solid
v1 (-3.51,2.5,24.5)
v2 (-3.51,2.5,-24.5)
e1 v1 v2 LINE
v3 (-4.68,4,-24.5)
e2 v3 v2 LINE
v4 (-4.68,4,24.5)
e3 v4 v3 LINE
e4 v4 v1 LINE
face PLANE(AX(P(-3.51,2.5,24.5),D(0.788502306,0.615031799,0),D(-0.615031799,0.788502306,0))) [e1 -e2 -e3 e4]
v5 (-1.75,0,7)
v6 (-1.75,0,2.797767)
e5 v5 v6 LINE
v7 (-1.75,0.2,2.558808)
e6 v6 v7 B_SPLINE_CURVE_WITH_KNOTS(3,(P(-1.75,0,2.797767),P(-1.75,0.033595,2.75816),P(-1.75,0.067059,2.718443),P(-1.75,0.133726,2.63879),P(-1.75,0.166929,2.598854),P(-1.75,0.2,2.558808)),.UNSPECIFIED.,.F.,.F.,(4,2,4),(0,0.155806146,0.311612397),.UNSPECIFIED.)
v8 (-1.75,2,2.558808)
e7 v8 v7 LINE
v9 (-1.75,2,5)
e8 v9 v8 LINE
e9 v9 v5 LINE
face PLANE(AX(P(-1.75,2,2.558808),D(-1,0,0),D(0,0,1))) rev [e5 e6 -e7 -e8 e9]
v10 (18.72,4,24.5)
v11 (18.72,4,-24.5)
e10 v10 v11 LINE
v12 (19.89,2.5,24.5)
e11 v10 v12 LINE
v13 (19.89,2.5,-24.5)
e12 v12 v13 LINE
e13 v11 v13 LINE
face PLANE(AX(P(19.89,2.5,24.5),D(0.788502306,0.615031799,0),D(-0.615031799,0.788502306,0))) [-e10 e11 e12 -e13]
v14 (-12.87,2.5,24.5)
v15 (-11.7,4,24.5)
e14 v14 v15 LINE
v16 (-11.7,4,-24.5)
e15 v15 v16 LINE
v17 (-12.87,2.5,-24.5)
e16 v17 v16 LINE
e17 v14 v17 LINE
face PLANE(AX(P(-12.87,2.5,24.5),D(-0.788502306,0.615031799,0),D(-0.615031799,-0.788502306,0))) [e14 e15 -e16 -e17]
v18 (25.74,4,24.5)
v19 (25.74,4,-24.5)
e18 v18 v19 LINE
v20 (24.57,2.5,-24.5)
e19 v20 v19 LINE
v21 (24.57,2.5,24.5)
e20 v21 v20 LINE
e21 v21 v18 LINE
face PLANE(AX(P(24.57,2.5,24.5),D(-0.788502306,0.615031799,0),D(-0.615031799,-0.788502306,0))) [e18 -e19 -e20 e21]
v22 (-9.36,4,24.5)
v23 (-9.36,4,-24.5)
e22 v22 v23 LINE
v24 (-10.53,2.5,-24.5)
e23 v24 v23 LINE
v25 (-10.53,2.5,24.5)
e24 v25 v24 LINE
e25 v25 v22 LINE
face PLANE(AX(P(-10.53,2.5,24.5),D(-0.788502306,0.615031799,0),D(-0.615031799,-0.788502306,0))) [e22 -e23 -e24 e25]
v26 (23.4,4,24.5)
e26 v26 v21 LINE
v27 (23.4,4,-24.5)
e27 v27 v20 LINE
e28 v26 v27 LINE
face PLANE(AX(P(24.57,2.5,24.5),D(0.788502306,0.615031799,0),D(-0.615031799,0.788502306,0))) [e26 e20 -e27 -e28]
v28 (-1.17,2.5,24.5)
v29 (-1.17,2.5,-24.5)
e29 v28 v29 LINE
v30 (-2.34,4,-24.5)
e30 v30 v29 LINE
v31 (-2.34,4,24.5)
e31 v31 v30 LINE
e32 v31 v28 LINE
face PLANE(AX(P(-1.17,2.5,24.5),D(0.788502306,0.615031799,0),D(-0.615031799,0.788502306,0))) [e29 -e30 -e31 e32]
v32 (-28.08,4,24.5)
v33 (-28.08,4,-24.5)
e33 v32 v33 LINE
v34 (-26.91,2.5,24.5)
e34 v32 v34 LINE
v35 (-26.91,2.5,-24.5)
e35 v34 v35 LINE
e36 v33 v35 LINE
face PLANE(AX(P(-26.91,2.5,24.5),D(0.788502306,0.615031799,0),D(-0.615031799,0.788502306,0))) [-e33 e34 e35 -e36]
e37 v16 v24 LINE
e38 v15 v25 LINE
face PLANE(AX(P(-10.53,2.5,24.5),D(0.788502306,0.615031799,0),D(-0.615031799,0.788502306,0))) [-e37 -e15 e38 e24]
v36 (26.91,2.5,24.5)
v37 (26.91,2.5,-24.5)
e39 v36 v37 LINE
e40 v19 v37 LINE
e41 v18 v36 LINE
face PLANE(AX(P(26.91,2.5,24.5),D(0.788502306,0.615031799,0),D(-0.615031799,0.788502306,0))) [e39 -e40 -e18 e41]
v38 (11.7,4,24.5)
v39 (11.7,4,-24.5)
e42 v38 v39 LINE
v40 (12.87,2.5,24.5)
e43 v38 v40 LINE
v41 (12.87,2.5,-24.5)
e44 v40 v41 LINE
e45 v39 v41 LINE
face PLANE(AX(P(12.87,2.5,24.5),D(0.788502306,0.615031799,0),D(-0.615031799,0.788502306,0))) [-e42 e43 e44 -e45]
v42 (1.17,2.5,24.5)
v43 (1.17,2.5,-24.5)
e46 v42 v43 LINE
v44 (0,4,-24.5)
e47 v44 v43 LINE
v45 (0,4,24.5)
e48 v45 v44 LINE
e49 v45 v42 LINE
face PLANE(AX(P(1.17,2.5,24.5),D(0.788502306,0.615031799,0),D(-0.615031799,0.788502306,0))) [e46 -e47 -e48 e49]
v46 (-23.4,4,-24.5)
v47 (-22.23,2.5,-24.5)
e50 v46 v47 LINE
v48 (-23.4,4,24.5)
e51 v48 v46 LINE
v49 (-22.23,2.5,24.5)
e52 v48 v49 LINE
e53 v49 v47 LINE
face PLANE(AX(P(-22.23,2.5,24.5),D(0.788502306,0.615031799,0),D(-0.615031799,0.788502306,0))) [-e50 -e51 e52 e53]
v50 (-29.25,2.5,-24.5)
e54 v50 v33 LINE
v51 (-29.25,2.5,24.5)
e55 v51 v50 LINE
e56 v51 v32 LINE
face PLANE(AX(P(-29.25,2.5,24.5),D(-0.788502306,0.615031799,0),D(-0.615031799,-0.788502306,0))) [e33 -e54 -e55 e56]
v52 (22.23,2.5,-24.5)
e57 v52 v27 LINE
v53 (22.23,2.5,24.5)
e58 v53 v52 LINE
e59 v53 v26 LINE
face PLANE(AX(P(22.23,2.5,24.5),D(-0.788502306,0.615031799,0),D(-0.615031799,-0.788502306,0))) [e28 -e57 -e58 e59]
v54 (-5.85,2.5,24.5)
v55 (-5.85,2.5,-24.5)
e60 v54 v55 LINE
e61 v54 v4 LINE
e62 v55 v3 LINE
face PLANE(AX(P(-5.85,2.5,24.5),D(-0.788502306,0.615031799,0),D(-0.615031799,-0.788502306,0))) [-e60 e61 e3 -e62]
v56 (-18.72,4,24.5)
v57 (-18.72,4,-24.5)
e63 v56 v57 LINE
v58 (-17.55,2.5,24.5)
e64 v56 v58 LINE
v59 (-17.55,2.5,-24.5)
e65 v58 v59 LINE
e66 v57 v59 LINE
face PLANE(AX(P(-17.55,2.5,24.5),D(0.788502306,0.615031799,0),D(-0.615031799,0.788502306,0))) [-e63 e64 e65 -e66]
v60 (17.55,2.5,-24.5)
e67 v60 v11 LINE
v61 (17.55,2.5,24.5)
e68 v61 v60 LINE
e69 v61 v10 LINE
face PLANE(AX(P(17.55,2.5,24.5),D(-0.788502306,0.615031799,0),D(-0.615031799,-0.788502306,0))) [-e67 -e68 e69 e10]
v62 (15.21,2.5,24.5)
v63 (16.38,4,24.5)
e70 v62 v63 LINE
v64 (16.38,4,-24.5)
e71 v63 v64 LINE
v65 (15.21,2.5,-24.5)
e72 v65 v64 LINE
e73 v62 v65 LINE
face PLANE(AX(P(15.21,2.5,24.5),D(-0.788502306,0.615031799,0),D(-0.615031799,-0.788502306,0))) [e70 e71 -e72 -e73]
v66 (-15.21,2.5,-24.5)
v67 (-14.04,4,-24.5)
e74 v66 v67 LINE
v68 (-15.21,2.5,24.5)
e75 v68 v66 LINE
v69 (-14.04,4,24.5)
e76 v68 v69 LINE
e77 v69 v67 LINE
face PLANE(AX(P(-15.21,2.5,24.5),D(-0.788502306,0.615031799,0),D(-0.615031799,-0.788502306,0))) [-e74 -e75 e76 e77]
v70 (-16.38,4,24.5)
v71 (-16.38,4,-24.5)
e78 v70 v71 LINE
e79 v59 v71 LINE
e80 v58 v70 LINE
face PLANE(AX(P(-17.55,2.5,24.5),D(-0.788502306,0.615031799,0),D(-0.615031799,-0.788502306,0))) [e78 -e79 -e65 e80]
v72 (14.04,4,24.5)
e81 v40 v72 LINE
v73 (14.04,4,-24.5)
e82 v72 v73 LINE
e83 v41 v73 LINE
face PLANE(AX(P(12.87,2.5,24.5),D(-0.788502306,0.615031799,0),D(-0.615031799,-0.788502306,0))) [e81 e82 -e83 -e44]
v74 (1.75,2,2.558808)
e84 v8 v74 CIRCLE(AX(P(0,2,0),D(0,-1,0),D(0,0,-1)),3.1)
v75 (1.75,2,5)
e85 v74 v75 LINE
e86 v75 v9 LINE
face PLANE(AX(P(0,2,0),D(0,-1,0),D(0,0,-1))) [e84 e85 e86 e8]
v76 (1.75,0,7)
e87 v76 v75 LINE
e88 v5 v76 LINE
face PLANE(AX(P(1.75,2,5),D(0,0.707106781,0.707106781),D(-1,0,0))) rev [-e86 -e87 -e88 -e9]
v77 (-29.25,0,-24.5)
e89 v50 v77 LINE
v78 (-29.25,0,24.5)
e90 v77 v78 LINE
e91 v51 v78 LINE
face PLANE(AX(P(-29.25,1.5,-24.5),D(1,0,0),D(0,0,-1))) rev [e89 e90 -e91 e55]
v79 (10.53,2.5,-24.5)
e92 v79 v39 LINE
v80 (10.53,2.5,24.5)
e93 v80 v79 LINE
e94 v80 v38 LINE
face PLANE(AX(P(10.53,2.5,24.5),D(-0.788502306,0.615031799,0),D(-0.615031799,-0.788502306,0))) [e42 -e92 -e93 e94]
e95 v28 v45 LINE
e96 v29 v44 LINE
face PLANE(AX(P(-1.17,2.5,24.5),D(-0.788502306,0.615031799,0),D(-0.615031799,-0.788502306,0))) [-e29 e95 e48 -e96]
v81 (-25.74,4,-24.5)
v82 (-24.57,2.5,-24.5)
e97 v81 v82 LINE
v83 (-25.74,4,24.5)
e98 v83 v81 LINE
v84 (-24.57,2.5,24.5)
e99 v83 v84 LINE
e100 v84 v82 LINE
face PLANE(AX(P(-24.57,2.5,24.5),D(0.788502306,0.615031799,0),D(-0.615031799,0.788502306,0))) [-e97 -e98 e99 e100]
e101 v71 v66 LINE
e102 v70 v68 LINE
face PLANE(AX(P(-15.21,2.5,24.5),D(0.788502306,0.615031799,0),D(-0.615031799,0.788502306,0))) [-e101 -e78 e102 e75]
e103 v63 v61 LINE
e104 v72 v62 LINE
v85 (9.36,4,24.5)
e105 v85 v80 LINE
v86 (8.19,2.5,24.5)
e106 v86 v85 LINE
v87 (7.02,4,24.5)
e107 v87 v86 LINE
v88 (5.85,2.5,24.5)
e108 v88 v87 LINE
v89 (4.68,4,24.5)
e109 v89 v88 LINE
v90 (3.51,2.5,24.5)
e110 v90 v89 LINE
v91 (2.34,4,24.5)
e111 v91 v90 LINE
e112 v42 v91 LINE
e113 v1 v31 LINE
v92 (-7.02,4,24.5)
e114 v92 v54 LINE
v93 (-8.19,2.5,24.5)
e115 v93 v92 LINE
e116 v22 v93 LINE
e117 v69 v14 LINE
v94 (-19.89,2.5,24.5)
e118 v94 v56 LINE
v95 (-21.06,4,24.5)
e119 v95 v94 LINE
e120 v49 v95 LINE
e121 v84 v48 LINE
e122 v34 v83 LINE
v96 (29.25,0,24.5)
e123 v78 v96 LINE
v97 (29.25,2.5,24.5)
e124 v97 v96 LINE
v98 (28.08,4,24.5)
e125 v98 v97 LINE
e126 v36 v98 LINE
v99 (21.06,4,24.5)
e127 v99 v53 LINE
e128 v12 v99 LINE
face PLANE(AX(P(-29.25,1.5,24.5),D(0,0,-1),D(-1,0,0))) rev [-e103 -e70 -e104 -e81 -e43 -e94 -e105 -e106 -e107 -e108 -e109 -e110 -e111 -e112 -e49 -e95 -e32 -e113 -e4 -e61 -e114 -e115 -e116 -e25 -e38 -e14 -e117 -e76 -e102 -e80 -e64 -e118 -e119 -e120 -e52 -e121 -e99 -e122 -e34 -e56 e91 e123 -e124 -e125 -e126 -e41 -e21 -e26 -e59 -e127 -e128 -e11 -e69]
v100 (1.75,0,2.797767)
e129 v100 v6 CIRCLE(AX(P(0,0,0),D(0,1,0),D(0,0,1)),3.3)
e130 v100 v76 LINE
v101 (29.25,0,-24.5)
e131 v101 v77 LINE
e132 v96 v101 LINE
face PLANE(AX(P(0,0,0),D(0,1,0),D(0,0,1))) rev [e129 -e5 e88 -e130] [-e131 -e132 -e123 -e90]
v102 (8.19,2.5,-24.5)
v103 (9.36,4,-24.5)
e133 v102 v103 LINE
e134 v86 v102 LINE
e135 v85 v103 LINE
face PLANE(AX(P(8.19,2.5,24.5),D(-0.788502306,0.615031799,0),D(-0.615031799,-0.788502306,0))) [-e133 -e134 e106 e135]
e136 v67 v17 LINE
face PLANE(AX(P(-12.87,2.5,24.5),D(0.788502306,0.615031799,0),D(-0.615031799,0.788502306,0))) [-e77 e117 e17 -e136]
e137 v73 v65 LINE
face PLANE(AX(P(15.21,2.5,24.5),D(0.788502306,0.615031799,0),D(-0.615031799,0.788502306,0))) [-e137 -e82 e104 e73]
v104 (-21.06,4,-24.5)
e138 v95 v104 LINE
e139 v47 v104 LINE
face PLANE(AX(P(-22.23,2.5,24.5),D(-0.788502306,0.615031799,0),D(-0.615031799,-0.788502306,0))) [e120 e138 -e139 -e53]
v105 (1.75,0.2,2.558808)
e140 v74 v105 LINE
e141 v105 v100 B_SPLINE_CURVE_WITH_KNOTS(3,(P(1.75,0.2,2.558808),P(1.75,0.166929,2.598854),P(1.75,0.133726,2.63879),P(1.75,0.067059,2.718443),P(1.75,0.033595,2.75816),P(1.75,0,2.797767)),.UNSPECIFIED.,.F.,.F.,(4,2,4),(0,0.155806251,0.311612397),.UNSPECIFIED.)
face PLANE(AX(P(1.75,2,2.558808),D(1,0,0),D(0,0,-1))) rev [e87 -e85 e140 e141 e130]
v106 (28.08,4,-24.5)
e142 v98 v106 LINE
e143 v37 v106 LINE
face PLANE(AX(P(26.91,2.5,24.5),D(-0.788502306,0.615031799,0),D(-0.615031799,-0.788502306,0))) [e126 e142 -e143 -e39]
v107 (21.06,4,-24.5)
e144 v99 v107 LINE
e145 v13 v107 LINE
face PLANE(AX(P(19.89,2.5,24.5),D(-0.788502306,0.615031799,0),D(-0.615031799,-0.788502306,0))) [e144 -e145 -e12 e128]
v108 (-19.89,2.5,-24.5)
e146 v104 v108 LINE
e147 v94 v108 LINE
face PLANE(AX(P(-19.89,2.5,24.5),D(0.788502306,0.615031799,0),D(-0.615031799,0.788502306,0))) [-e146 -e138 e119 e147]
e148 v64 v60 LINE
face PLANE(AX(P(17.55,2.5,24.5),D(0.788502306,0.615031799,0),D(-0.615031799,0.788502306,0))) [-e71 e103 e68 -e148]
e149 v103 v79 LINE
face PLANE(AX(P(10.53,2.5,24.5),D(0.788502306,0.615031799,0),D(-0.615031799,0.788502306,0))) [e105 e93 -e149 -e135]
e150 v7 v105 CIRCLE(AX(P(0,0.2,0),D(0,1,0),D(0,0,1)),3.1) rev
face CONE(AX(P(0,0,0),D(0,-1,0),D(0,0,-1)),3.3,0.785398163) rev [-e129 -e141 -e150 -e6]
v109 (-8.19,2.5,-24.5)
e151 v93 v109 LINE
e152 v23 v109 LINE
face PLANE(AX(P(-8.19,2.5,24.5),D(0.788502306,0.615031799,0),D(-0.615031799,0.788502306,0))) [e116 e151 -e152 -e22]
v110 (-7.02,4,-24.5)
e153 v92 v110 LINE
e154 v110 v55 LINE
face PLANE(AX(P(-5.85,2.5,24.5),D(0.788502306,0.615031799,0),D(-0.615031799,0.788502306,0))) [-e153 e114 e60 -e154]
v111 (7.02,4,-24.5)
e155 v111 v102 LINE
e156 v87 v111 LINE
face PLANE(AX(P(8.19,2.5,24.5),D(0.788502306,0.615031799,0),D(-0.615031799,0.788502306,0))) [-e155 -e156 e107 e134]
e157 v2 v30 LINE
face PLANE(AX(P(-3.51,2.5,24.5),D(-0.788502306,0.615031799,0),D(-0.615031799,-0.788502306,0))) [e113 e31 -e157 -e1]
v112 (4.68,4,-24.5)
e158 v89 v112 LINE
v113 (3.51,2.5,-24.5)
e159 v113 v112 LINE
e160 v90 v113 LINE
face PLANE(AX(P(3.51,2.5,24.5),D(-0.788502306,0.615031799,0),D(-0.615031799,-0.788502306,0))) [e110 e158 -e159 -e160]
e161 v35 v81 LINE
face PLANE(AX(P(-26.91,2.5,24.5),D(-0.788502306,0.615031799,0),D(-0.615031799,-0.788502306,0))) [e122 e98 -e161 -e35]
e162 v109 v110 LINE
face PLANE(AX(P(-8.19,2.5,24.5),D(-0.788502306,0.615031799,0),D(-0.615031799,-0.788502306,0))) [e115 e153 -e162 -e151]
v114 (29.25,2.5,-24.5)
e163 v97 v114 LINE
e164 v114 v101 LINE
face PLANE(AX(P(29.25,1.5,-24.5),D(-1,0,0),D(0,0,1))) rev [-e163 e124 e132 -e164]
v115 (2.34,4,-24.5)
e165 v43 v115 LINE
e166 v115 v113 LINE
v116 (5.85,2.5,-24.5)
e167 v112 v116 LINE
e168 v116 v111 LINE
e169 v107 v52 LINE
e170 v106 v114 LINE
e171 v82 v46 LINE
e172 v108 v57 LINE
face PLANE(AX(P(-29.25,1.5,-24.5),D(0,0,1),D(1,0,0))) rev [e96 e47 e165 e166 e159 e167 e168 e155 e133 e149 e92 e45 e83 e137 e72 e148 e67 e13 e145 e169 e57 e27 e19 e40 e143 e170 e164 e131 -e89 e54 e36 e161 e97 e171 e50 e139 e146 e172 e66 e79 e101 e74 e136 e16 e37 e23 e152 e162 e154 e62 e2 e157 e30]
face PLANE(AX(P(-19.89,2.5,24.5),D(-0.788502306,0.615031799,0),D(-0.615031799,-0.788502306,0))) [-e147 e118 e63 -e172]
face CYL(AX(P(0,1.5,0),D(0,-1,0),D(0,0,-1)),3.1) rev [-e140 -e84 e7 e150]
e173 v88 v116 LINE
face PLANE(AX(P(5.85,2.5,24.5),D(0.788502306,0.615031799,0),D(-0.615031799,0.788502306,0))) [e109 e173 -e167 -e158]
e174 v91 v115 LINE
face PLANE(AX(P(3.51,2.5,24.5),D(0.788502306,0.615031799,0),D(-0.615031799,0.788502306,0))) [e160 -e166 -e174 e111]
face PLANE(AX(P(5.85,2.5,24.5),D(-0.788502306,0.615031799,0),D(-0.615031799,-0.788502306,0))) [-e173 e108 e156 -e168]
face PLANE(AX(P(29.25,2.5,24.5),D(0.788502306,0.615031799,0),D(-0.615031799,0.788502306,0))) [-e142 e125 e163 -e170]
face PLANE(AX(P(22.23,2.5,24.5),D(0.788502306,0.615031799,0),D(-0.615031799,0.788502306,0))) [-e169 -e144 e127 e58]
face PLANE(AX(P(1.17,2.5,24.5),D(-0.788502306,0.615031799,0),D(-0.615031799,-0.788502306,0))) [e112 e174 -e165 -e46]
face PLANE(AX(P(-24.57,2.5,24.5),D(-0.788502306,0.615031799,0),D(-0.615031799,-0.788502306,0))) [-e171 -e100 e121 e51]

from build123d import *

# Parameters (mm, degrees)
SKETCH1_W           = 58.5
SKETCH1_H           = 49
SKETCH1_R           = 3.1
BOSS_EXTRUDE1_DEPTH = 1.5
BOSS_EXTRUDE2_DEPTH = 49
CUT_EXTRUDE1_DEPTH  = 2
CHAMFER1_SIZE       = 2
CHAMFER2_SIZE       = 0.2


with BuildPart() as part:
    # Sketch1 → Boss-Extrude1 (new body)
    with BuildSketch(Plane(origin=(0, 0, 0), x_dir=(1, 0, 0), z_dir=(0, 1, 0))):
        Rectangle(SKETCH1_W, SKETCH1_H)
        with Locations(Location((0, 0, 0), (0, 0, 270))):
            Circle(SKETCH1_R, mode=Mode.SUBTRACT)
    extrude(amount=BOSS_EXTRUDE1_DEPTH)

    # Sketch2 → Boss-Extrude2 (add)
    with BuildSketch(Plane(origin=(0, 0, -24.5), x_dir=(-1, 0, 0), z_dir=(0, 0, -1))):
        Polygon((-29.25, 1.5), (29.25, 1.5), (29.25, 2.5), (28.08, 4), (26.91, 2.5), (25.74, 4), (24.57, 2.5), (23.4, 4), (22.23, 2.5), (21.06, 4), (19.89, 2.5), (18.72, 4), (17.55, 2.5), (16.38, 4), (15.21, 2.5), (14.04, 4), (12.87, 2.5), (11.7, 4), (10.53, 2.5), (9.36, 4), (8.19, 2.5), (7.02, 4), (5.85, 2.5), (4.68, 4), (3.51, 2.5), (2.34, 4), (1.17, 2.5), (0, 4), (-1.17, 2.5), (-2.34, 4), (-3.51, 2.5), (-4.68, 4), (-5.85, 2.5), (-7.02, 4), (-8.19, 2.5), (-9.36, 4), (-10.53, 2.5), (-11.7, 4), (-12.87, 2.5), (-14.04, 4), (-15.21, 2.5), (-16.38, 4), (-17.55, 2.5), (-18.72, 4), (-19.89, 2.5), (-21.06, 4), (-22.23, 2.5), (-23.4, 4), (-24.57, 2.5), (-25.74, 4), (-26.91, 2.5), (-28.08, 4), (-29.25, 2.5), align=None)
    extrude(amount=-BOSS_EXTRUDE2_DEPTH)

    # Sketch3 → Cut-Extrude1 (cut)
    with BuildSketch(Plane(origin=(0, 0, 0), x_dir=(-1, 0, 0), z_dir=(0, -1, 0))):
        with BuildLine():
            Line((-1.75, -2.558808316), (-1.75, -5))
            Line((-1.75, -5), (1.75, -5))
            Line((1.75, -5), (1.75, -2.558808316))
            ThreePointArc((1.75, -2.558808316), (0, 3.1), (-1.75, -2.558808316))
        make_face()
    extrude(amount=-CUT_EXTRUDE1_DEPTH, mode=Mode.SUBTRACT)

    # Chamfer1
    chamfer1_edges = [part.edges().sort_by_distance(p)[0] for p in [
        (0, 0, 5),
    ]]
    chamfer(chamfer1_edges, length=CHAMFER1_SIZE - 0.0001)  # a hair under: the kernel refuses the full size

    # Chamfer2
    chamfer2_edges = [part.edges().sort_by_distance(p)[0] for p in [
        (0, 0, -3.1),
    ]]
    chamfer(chamfer2_edges, length=CHAMFER2_SIZE)


solid = part.part
